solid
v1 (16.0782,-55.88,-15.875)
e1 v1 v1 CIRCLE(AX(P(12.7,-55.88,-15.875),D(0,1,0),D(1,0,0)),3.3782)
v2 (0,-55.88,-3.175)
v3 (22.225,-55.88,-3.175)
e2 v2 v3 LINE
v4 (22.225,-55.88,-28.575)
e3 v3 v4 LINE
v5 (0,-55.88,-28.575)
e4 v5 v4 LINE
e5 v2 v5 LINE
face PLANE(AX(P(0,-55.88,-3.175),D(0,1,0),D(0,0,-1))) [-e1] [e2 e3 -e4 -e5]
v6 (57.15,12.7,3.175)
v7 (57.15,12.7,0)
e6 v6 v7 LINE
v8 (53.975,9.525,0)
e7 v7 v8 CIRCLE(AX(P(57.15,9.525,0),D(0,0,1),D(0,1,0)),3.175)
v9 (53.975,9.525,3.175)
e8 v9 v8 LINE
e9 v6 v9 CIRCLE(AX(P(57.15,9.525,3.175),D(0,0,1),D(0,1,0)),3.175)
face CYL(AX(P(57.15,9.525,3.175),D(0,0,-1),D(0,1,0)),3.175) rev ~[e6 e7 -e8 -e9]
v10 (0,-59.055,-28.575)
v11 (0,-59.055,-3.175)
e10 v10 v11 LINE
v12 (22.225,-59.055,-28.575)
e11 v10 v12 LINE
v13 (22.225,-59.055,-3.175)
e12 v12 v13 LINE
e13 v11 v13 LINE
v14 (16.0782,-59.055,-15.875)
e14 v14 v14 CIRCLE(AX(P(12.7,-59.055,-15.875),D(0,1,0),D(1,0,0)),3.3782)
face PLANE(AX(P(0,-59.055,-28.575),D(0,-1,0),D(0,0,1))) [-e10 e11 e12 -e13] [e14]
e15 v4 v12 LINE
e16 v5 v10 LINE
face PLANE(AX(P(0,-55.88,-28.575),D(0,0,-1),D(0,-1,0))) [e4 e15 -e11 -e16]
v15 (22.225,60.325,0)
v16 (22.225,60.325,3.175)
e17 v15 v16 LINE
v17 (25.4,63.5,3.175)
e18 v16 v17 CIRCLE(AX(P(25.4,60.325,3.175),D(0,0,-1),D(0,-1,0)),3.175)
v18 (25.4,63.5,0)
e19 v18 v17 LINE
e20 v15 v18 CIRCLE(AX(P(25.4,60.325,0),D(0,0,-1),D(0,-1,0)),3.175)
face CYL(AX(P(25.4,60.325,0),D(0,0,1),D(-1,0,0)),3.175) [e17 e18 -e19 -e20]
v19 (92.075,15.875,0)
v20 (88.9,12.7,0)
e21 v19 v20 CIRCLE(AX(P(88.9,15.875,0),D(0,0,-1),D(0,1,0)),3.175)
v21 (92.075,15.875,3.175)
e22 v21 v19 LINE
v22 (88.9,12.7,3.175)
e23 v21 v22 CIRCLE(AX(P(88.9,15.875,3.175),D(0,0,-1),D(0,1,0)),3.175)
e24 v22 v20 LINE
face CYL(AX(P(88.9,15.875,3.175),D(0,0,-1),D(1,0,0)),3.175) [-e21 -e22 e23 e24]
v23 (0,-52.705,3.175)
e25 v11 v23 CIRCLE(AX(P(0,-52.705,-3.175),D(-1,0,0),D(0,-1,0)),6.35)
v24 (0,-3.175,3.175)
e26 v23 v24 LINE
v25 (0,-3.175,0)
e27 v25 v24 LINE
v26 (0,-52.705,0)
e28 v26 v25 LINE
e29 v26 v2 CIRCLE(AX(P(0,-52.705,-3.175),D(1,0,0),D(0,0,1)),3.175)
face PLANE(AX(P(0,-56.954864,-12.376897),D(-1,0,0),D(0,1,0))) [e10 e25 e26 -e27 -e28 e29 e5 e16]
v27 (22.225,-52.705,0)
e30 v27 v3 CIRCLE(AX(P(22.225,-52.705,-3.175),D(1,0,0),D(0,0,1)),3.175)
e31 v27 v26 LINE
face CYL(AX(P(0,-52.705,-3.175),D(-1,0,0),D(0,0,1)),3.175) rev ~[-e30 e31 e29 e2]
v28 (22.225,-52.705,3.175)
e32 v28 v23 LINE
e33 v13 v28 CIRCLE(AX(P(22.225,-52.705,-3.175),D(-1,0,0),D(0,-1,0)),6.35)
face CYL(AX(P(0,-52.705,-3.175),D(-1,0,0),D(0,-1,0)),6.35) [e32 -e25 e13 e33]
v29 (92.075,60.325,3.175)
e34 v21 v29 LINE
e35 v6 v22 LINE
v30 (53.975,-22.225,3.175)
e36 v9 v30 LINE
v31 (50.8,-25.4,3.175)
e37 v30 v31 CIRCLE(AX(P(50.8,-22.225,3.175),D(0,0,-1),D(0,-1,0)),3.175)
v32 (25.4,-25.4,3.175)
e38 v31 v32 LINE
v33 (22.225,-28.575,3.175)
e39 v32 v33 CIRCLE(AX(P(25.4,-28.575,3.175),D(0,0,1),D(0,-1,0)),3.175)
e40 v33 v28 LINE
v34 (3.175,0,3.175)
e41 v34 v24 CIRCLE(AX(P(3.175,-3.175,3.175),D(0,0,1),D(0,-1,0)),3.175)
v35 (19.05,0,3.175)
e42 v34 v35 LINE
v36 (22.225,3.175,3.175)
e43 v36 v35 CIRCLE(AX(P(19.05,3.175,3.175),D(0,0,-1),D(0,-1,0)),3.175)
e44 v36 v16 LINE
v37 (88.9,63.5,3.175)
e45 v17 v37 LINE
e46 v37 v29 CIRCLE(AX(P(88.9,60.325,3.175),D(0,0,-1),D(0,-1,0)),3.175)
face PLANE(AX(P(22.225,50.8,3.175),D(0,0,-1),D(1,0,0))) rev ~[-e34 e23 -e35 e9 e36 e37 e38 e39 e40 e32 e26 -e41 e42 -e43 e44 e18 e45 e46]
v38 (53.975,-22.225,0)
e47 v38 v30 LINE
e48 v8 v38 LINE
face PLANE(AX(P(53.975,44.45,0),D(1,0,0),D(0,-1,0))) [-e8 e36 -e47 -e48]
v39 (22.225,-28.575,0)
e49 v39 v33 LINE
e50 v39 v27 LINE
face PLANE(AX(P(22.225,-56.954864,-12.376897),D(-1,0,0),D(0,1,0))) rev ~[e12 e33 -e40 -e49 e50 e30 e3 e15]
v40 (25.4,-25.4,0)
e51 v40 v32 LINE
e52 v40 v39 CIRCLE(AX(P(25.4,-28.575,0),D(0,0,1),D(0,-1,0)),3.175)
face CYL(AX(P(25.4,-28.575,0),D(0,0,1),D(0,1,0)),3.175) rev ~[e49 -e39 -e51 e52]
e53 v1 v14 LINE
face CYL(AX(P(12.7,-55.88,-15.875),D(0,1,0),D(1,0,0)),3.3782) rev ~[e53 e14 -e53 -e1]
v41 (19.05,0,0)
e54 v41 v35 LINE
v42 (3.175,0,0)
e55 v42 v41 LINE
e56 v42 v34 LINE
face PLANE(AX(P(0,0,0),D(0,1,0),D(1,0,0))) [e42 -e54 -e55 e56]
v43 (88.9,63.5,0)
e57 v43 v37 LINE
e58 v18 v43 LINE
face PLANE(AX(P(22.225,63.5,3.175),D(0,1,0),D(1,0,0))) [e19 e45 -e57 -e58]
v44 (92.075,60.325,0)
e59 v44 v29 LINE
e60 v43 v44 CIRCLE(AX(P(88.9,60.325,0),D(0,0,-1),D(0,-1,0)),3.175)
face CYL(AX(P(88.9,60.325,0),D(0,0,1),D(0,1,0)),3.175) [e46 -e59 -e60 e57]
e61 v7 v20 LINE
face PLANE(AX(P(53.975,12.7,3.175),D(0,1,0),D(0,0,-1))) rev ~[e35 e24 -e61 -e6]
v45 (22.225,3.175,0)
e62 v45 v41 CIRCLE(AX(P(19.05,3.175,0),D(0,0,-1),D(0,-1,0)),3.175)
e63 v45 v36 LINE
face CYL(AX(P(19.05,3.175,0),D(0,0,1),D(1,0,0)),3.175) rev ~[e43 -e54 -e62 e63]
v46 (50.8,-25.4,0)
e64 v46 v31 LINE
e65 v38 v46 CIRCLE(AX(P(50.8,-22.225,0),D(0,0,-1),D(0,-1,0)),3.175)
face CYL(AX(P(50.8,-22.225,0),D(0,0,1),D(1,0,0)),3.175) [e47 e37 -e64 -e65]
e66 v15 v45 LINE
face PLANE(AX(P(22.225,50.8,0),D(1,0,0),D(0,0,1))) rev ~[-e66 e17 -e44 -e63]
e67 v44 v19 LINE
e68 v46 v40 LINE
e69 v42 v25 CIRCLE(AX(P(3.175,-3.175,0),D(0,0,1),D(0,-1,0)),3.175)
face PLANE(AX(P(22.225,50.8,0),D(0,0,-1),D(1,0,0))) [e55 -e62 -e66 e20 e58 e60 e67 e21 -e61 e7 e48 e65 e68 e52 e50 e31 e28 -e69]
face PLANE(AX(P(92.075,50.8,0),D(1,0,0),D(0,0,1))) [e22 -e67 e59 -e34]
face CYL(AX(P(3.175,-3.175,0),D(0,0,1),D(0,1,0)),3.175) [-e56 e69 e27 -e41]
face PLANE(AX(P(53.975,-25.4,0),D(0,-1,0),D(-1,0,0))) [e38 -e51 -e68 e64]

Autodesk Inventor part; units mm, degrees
ref_plane "YZ Plane" through (0, 0, 0) normal (1, 0, 0) x (0, 1, 0)
ref_plane "XZ Plane" through (0, 0, 0) normal (0, 1, 0) x (-1, 0, 0)
ref_plane "XY Plane" through (0, 0, 0) normal (0, 0, 1) x (1, 0, 0)
sketch "Sketch1 outline for Plate1" plane through (0, 0, 0) normal (0, 0, 1) x (1, 0, 0)
  line L0 (53.975, 44.45) -> (53.975, 19.05)
  line L1 (53.975, 19.05) -> (53.975, -25.4)
  line L2 (53.975, -25.4) -> (22.225, -25.4)
  line L3 (22.225, -25.4) -> (22.225, -59.055)
  line L4 (22.225, -59.055) -> (0, -59.055)
  line L5 (0, -59.055) -> (0, 0)
  line L6 (0, 0) -> (22.225, 0)
  line L7 (22.225, 0) -> (22.225, 50.8)
  line L8 (22.225, 50.8) -> (47.625, 50.8)
  line L9 (47.625, 50.8) -> (53.975, 50.8)
  line L10 (53.975, 50.8) -> (53.975, 44.45)
extrude "Plate1" add sketch "Sketch1 outline for Plate1" along normal blind 3.175
sketch "Sketch2" plane through (0, -55.88, 3.175) normal (0, -1, 0) x (1, 0, 0)
  line L0 (22.225, 0) -> (0, 0)
  line L1 (0, 0) -> (0, -31.75)
  line L2 (0, -31.75) -> (22.225, -31.75)
  line L3 (22.225, -31.75) -> (22.225, 0)
edge flange "Flange1" height 31.75 angle 90 thickness 3.175 bend radius 3.175 thickness toward (0, -1, 0) relief straight relief width 3.175 relief depth 1.5875 edges at (11.1125, -59.055, 0) wall of the first edge with corners at (22.225, -55.88, 3.175) (0, -55.88, 3.175) (0, -55.88, -28.575) (22.225, -55.88, -28.575)
bend "Bend1"
corner "Corner1"
sketch "Sketch3" plane through (0, -55.88, -28.575) normal (0, 1, 0) x (1, 0, 0)
  circle A0 centre (12.7, -12.7) radius 3.3782 projected
  point P0 (0, -28.575)
extrude "Cut1" cut sketch "Sketch3" against normal blind 3.175
sketch "Sketch1" plane through (0, 0, 0) normal (0, 0, 1) x (1, 0, 0)
  line L0 (0, 0) -> (82.111681, 0)
  line L1 (56.711681, -22.225) -> (0, -22.225)
  line L2 (85.286681, -3.175) -> (85.286681, -19.05)
  line L3 (29.00734, 0) -> (29.00734, -1.5875)
  line L4 (29.00734, -1.5875) -> (28.21359, -1.5875)
  line L5 (29.00734, -1.5875) -> (29.80109, -1.5875)
  line L6 (29.80109, -1.5875) -> (29.80109, 0)
  line L7 (28.21359, -1.5875) -> (28.21359, 0)
  line L8 (29.80109, -22.225) -> (29.80109, -20.6375)
  line L9 (29.80109, -20.6375) -> (28.21359, -20.6375)
  line L10 (28.21359, -20.6375) -> (28.21359, -22.225)
sketch "Sketch5" plane through (53.975, -25.4, 0) normal (1, 0, 0) x (0, 0, -1)
  line L0 (-3.175, 76.2) -> (-3.175, 0) projected
  line L1 (0, 76.2) -> (0, 0) projected
  line L2 (0, 76.2) -> (-3.175, 76.2) projected
  line L3 (-3.175, 76.2) -> (-3.175, 38.1)
  line L4 (-3.175, 38.1) -> (0, 38.1)
  point P0 (0, 25.4)
  dimension "d13" = 38.1
extrude "Extrusion1" add sketch "Sketch5" along normal blind 38.1
sketch "Sketch6" plane through (22.225, 50.8, 3.175) normal (0, 1, 0) x (1, 0, 0)
  line L0 (0, 0) -> (69.85, 0) projected
  line L1 (69.85, 3.175) -> (69.85, 0) projected
  line L2 (0, 3.175) -> (69.85, 3.175) projected
  line L3 (0, 3.175) -> (0, 0) projected
  point P0 (-22.225, 3.175)
extrude "Extrusion2" add sketch "Sketch6" along normal blind 12.7
fillet "Fillet2" radius 3.175 8 edges at (22.225, 63.5, 1.5875) (92.075, 63.5, 1.5875) (22.225, 0, 1.5875) (0, 0, 1.5875) (92.075, 12.7, 1.5875) (53.975, 12.7, 1.5875) (53.975, -25.4, 1.5875) (22.225, -25.4, 1.5875)
equation "\"d1\" = BendReliefWidth"
equation "\"d2\" = BendReliefDepth"
equation "\"d3\" = MinimumRemnant"
equation "\"d4\" = BendRadius"
equation "\"d7\" = BendRadius"
equation "\"d8\" = CornerReliefSize"
equation "\"d9\" = GapSize"
equation "\"d10\" = JacobiRadiusSize"
equation "\"BendRadius\" = Thickness"
equation "\"BendReliefWidth\" = Thickness"
equation "\"BendReliefDepth\" = 0.5 * Thickness"
equation "\"CornerReliefSize\" = 4 * Thickness"
equation "\"MinimumRemnant\" = 2 * Thickness"
equation "\"TransitionRadius\" = BendRadius"
equation "\"JacobiRadiusSize\" = Thickness"
equation "\"GapSize\" = Thickness"
equation "\"d0\" = BendRadius"
equation "\"d4\" = Thickness"
equation "\"Thickness\" = 3.175"
properties part number "cylinder mount" material "Aluminum 6061"
